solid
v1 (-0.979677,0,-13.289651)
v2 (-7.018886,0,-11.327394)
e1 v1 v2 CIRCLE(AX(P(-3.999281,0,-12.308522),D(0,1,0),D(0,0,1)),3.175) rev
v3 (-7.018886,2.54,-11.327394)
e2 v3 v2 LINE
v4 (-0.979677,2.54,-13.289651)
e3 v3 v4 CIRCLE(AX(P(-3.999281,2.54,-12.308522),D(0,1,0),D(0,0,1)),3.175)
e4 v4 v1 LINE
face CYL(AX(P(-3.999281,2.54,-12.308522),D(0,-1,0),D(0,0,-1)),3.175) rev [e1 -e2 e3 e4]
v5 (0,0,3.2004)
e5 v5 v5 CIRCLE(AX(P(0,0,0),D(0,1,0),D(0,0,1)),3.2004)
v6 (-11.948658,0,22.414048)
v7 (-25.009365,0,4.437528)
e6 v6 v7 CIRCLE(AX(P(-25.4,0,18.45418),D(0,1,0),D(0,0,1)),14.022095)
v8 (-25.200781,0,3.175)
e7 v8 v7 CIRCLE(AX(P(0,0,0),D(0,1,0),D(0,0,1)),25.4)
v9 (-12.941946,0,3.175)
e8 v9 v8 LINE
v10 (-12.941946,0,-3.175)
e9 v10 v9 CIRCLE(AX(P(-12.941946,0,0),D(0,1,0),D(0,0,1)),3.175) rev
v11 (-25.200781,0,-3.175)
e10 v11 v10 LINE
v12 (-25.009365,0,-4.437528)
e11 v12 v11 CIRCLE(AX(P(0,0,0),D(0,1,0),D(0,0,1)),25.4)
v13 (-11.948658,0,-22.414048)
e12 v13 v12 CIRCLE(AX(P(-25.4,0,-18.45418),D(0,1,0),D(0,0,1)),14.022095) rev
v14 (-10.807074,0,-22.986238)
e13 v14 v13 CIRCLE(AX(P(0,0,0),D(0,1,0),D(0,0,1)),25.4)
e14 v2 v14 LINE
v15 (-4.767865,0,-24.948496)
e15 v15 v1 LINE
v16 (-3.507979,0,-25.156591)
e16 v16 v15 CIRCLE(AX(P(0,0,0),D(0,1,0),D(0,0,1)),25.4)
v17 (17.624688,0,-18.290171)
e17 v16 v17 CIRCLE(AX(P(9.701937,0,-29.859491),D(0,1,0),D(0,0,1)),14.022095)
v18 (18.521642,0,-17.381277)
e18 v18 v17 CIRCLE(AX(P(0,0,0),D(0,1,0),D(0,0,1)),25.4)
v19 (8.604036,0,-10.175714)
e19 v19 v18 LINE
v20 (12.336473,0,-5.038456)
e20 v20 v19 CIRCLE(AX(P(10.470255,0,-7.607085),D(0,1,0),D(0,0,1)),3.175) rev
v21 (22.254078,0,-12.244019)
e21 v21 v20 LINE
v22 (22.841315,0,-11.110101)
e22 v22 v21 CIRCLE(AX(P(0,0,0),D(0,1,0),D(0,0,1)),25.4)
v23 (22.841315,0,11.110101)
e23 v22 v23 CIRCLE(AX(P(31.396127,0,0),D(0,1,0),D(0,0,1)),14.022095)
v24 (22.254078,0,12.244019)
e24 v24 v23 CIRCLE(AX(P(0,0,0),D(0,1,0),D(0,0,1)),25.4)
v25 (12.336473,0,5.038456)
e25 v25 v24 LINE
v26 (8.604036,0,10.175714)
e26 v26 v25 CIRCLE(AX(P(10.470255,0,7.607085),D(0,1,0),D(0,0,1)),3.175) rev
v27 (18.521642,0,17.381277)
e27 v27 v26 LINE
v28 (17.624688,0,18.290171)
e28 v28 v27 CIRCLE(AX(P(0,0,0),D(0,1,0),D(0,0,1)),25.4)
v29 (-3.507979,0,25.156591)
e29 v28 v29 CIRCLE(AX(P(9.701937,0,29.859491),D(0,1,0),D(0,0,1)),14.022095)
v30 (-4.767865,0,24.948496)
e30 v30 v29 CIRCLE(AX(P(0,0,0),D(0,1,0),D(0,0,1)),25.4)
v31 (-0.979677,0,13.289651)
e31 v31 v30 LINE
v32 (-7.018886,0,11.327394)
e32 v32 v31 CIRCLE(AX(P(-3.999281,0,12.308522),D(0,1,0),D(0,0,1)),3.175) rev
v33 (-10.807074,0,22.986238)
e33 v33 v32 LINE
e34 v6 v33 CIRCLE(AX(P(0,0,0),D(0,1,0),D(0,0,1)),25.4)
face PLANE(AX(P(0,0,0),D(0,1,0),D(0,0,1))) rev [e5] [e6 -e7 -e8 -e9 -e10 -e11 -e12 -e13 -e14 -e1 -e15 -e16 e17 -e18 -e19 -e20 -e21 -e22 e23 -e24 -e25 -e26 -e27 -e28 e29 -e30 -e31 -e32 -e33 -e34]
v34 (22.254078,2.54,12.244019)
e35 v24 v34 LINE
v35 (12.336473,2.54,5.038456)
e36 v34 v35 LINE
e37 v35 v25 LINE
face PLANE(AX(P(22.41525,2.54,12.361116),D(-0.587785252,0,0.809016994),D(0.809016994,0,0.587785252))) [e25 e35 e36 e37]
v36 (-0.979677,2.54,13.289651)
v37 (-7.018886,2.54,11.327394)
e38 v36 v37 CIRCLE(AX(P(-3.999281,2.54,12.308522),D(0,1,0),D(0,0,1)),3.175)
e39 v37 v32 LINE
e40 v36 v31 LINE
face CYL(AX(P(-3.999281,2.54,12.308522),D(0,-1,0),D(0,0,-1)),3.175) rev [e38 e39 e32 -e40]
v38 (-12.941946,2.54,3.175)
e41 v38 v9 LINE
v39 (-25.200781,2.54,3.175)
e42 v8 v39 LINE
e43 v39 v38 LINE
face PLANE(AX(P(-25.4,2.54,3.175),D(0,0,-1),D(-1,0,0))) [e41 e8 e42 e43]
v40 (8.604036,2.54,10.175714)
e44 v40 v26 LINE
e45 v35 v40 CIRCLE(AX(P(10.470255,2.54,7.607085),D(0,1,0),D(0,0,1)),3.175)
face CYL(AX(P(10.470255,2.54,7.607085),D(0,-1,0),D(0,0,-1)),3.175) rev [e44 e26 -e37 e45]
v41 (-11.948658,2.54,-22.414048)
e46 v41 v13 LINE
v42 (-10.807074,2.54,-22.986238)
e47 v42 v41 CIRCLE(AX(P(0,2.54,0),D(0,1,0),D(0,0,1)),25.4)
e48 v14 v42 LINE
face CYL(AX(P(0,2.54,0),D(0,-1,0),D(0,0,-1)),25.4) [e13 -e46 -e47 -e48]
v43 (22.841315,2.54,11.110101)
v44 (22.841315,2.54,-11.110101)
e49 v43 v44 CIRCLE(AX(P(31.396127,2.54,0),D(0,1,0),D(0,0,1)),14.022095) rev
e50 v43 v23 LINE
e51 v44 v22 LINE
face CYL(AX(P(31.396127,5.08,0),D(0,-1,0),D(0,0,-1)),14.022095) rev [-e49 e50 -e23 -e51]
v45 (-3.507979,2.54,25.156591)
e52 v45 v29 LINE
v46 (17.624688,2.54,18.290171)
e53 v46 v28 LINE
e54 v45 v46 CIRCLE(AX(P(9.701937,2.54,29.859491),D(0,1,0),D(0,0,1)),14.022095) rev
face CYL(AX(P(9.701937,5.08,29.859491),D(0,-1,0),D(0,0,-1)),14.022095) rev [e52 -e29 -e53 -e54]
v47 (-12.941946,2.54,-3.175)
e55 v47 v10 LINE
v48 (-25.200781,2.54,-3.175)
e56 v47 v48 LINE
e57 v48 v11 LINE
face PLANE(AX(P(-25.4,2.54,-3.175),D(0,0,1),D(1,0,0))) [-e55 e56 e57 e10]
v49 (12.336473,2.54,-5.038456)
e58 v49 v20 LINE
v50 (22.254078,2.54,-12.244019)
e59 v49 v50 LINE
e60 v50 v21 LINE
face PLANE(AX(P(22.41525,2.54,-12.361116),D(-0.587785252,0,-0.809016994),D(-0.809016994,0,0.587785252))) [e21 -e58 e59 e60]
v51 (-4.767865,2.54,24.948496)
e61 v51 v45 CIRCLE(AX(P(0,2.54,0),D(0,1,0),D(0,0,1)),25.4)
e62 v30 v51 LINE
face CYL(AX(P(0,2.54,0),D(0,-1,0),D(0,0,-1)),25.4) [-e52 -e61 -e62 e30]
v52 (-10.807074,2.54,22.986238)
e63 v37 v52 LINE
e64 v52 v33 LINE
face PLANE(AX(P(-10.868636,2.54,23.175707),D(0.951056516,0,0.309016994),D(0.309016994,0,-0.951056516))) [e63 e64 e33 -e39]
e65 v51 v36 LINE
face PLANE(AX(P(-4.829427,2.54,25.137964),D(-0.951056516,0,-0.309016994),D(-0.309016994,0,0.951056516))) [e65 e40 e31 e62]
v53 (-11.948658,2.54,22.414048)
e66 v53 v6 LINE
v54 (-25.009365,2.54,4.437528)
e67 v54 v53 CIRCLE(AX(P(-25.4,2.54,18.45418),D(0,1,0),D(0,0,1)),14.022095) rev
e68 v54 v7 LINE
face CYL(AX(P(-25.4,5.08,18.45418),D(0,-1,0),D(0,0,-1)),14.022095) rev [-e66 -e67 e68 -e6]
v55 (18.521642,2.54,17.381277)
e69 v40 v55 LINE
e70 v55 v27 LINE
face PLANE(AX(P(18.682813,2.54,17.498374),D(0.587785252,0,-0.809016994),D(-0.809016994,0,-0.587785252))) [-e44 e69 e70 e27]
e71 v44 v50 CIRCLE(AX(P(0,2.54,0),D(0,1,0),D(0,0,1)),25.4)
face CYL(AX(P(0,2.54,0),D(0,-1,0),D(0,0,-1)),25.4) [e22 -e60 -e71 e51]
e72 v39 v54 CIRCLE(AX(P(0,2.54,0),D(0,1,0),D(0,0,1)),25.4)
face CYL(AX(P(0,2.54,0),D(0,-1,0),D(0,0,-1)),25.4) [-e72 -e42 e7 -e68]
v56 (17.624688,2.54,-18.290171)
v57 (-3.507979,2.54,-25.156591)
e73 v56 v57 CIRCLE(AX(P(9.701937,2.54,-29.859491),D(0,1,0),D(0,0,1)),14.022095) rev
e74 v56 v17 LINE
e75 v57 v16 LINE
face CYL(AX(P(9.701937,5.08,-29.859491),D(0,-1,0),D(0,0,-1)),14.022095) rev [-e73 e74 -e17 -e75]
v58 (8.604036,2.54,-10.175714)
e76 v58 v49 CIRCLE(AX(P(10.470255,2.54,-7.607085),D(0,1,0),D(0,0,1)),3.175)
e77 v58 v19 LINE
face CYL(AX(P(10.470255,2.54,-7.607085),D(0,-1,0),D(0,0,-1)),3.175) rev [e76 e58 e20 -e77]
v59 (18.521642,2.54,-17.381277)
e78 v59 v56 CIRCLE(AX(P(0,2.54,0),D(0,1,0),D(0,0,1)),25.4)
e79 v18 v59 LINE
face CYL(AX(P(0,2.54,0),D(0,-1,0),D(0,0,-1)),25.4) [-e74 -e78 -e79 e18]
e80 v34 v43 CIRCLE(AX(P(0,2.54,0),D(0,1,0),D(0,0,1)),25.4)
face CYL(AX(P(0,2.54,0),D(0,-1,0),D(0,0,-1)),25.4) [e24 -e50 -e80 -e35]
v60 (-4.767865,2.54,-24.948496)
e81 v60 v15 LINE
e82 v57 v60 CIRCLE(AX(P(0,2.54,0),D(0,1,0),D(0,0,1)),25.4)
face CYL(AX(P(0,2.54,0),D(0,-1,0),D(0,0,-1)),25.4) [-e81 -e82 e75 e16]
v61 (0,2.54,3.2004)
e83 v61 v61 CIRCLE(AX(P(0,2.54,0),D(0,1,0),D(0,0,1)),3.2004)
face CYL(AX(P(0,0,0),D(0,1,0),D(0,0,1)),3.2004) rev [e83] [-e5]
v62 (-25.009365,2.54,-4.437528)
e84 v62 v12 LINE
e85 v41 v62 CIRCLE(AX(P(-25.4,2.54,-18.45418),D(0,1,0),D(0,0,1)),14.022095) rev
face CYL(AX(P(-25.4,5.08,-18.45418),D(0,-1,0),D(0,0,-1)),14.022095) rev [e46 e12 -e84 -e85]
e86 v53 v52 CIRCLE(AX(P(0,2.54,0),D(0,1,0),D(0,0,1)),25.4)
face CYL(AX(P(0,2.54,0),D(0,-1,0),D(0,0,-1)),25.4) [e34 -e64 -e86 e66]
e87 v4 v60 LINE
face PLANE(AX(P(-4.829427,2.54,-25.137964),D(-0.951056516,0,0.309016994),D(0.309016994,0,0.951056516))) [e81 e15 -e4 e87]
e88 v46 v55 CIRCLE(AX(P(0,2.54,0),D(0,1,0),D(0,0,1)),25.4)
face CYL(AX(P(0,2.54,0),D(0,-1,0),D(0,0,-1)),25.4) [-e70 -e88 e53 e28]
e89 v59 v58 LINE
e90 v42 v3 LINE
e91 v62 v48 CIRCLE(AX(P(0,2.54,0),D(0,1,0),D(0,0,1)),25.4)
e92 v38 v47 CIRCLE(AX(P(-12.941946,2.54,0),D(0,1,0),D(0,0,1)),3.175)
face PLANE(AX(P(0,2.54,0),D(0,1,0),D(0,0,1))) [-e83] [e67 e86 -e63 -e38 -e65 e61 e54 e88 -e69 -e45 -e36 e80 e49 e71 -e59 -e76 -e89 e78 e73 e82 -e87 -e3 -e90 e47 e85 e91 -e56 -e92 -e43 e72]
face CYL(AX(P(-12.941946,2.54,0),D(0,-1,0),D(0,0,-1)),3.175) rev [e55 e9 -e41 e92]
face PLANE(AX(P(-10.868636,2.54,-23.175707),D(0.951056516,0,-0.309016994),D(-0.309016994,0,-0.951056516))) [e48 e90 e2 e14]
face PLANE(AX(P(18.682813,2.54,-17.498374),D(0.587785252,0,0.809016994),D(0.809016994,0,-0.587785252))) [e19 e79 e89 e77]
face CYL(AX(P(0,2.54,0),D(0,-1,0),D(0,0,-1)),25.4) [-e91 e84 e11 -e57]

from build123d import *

# Parameters (mm, degrees)
STOCK_PART1_1_DEPTH     = 2.54
CUT_EXTRUDE1_DEPTH      = 36.698530161
CUT_EXTRUDE1_DEPTH_BACK = 36.698530161
SKETCH1_R               = 3.2004


# Read off the part's stored shape, not the designer's step: Stock-Part1-1
with BuildPart() as part:
    # Stock-Part1-1 outline → Stock-Part1-1 (new body)
    with BuildSketch(Plane(origin=(0, 0, 0), x_dir=(1, 0, 0), z_dir=(0, 1, 0))):
        with BuildLine():
            ThreePointArc((-10.807074113, 22.986238255), (-11.381462581, 22.707318413), (-11.948658366, 22.414048346))
            ThreePointArc((-11.948658366, 22.414048346), (-14.055886871, 10.212199581), (-25.009365231, 4.437527549))
            ThreePointArc((-25.009365231, 4.437527549), (-25.113008503, 3.807466867), (-25.200781238, 3.175))
            Line((-25.200781238, 3.175), (-12.941946417, 3.175))
            ThreePointArc((-12.941946417, 3.175), (-9.766946417, 0), (-12.941946417, -3.175))
            Line((-12.941946417, -3.175), (-25.200781238, -3.175))
            ThreePointArc((-25.200781238, -3.175), (-25.113008503, -3.807466867), (-25.009365231, -4.437527549))
            ThreePointArc((-25.009365231, -4.437527549), (-14.055886871, -10.212199581), (-11.948658366, -22.414048346))
            ThreePointArc((-11.948658366, -22.414048346), (-11.381462581, -22.707318413), (-10.807074113, -22.986238255))
            Line((-10.807074113, -22.986238255), (-7.018885822, -11.327393516))
            ThreePointArc((-7.018885822, -11.327393516), (-3.018152425, -9.288918034), (-0.979676944, -13.289651431))
            Line((-0.979676944, -13.289651431), (-4.767865235, -24.948496169))
            ThreePointArc((-4.767865235, -24.948496169), (-4.139230233, -25.060462348), (-3.507979383, -25.156591197))
            ThreePointArc((-3.507979383, -25.156591197), (5.368871043, -16.523686022), (17.624688241, -18.290171252))
            ThreePointArc((17.624688241, -18.290171252), (18.078877786, -17.841361439), (18.521642117, -17.381276515))
            Line((18.521642117, -17.381276515), (8.604036416, -10.175714197))
            ThreePointArc((8.604036416, -10.175714197), (7.901625635, -5.740867064), (12.336472768, -5.038456283))
            Line((12.336472768, -5.038456283), (22.254078469, -12.244018601))
            ThreePointArc((22.254078469, -12.244018601), (22.554823532, -11.680750638), (22.84131474, -11.110100852))
            ThreePointArc((22.84131474, -11.110100852), (17.374031657, 0), (22.84131474, 11.110100852))
            ThreePointArc((22.84131474, 11.110100852), (22.554823532, 11.680750638), (22.254078469, 12.244018601))
            Line((22.254078469, 12.244018601), (12.336472768, 5.038456283))
            ThreePointArc((12.336472768, 5.038456283), (7.901625635, 5.740867064), (8.604036416, 10.175714197))
            Line((8.604036416, 10.175714197), (18.521642117, 17.381276515))
            ThreePointArc((18.521642117, 17.381276515), (18.078877786, 17.841361439), (17.624688241, 18.290171252))
            ThreePointArc((17.624688241, 18.290171252), (5.368871043, 16.523686022), (-3.507979383, 25.156591197))
            ThreePointArc((-3.507979383, 25.156591197), (-4.139230233, 25.060462348), (-4.767865235, 24.948496169))
            Line((-4.767865235, 24.948496169), (-0.979676944, 13.289651431))
            ThreePointArc((-0.979676944, 13.289651431), (-3.018152425, 9.288918034), (-7.018885822, 11.327393516))
            Line((-7.018885822, 11.327393516), (-10.807074113, 22.986238255))
        make_face()
    extrude(amount=STOCK_PART1_1_DEPTH)

    # Sketch1 → Cut-Extrude1 (cut, two sides: drawn at the far end of the back side and taken through both)
    with BuildSketch(Plane(origin=(0, 2.54, 0), x_dir=(1, 0, 0), z_dir=(0, 1, 0)).offset(-CUT_EXTRUDE1_DEPTH_BACK)):
        with Locations(Location((0, 0, 0), (0, 0, 270))):
            Circle(SKETCH1_R)
    extrude(amount=CUT_EXTRUDE1_DEPTH + CUT_EXTRUDE1_DEPTH_BACK, mode=Mode.SUBTRACT)


solid = part.part
